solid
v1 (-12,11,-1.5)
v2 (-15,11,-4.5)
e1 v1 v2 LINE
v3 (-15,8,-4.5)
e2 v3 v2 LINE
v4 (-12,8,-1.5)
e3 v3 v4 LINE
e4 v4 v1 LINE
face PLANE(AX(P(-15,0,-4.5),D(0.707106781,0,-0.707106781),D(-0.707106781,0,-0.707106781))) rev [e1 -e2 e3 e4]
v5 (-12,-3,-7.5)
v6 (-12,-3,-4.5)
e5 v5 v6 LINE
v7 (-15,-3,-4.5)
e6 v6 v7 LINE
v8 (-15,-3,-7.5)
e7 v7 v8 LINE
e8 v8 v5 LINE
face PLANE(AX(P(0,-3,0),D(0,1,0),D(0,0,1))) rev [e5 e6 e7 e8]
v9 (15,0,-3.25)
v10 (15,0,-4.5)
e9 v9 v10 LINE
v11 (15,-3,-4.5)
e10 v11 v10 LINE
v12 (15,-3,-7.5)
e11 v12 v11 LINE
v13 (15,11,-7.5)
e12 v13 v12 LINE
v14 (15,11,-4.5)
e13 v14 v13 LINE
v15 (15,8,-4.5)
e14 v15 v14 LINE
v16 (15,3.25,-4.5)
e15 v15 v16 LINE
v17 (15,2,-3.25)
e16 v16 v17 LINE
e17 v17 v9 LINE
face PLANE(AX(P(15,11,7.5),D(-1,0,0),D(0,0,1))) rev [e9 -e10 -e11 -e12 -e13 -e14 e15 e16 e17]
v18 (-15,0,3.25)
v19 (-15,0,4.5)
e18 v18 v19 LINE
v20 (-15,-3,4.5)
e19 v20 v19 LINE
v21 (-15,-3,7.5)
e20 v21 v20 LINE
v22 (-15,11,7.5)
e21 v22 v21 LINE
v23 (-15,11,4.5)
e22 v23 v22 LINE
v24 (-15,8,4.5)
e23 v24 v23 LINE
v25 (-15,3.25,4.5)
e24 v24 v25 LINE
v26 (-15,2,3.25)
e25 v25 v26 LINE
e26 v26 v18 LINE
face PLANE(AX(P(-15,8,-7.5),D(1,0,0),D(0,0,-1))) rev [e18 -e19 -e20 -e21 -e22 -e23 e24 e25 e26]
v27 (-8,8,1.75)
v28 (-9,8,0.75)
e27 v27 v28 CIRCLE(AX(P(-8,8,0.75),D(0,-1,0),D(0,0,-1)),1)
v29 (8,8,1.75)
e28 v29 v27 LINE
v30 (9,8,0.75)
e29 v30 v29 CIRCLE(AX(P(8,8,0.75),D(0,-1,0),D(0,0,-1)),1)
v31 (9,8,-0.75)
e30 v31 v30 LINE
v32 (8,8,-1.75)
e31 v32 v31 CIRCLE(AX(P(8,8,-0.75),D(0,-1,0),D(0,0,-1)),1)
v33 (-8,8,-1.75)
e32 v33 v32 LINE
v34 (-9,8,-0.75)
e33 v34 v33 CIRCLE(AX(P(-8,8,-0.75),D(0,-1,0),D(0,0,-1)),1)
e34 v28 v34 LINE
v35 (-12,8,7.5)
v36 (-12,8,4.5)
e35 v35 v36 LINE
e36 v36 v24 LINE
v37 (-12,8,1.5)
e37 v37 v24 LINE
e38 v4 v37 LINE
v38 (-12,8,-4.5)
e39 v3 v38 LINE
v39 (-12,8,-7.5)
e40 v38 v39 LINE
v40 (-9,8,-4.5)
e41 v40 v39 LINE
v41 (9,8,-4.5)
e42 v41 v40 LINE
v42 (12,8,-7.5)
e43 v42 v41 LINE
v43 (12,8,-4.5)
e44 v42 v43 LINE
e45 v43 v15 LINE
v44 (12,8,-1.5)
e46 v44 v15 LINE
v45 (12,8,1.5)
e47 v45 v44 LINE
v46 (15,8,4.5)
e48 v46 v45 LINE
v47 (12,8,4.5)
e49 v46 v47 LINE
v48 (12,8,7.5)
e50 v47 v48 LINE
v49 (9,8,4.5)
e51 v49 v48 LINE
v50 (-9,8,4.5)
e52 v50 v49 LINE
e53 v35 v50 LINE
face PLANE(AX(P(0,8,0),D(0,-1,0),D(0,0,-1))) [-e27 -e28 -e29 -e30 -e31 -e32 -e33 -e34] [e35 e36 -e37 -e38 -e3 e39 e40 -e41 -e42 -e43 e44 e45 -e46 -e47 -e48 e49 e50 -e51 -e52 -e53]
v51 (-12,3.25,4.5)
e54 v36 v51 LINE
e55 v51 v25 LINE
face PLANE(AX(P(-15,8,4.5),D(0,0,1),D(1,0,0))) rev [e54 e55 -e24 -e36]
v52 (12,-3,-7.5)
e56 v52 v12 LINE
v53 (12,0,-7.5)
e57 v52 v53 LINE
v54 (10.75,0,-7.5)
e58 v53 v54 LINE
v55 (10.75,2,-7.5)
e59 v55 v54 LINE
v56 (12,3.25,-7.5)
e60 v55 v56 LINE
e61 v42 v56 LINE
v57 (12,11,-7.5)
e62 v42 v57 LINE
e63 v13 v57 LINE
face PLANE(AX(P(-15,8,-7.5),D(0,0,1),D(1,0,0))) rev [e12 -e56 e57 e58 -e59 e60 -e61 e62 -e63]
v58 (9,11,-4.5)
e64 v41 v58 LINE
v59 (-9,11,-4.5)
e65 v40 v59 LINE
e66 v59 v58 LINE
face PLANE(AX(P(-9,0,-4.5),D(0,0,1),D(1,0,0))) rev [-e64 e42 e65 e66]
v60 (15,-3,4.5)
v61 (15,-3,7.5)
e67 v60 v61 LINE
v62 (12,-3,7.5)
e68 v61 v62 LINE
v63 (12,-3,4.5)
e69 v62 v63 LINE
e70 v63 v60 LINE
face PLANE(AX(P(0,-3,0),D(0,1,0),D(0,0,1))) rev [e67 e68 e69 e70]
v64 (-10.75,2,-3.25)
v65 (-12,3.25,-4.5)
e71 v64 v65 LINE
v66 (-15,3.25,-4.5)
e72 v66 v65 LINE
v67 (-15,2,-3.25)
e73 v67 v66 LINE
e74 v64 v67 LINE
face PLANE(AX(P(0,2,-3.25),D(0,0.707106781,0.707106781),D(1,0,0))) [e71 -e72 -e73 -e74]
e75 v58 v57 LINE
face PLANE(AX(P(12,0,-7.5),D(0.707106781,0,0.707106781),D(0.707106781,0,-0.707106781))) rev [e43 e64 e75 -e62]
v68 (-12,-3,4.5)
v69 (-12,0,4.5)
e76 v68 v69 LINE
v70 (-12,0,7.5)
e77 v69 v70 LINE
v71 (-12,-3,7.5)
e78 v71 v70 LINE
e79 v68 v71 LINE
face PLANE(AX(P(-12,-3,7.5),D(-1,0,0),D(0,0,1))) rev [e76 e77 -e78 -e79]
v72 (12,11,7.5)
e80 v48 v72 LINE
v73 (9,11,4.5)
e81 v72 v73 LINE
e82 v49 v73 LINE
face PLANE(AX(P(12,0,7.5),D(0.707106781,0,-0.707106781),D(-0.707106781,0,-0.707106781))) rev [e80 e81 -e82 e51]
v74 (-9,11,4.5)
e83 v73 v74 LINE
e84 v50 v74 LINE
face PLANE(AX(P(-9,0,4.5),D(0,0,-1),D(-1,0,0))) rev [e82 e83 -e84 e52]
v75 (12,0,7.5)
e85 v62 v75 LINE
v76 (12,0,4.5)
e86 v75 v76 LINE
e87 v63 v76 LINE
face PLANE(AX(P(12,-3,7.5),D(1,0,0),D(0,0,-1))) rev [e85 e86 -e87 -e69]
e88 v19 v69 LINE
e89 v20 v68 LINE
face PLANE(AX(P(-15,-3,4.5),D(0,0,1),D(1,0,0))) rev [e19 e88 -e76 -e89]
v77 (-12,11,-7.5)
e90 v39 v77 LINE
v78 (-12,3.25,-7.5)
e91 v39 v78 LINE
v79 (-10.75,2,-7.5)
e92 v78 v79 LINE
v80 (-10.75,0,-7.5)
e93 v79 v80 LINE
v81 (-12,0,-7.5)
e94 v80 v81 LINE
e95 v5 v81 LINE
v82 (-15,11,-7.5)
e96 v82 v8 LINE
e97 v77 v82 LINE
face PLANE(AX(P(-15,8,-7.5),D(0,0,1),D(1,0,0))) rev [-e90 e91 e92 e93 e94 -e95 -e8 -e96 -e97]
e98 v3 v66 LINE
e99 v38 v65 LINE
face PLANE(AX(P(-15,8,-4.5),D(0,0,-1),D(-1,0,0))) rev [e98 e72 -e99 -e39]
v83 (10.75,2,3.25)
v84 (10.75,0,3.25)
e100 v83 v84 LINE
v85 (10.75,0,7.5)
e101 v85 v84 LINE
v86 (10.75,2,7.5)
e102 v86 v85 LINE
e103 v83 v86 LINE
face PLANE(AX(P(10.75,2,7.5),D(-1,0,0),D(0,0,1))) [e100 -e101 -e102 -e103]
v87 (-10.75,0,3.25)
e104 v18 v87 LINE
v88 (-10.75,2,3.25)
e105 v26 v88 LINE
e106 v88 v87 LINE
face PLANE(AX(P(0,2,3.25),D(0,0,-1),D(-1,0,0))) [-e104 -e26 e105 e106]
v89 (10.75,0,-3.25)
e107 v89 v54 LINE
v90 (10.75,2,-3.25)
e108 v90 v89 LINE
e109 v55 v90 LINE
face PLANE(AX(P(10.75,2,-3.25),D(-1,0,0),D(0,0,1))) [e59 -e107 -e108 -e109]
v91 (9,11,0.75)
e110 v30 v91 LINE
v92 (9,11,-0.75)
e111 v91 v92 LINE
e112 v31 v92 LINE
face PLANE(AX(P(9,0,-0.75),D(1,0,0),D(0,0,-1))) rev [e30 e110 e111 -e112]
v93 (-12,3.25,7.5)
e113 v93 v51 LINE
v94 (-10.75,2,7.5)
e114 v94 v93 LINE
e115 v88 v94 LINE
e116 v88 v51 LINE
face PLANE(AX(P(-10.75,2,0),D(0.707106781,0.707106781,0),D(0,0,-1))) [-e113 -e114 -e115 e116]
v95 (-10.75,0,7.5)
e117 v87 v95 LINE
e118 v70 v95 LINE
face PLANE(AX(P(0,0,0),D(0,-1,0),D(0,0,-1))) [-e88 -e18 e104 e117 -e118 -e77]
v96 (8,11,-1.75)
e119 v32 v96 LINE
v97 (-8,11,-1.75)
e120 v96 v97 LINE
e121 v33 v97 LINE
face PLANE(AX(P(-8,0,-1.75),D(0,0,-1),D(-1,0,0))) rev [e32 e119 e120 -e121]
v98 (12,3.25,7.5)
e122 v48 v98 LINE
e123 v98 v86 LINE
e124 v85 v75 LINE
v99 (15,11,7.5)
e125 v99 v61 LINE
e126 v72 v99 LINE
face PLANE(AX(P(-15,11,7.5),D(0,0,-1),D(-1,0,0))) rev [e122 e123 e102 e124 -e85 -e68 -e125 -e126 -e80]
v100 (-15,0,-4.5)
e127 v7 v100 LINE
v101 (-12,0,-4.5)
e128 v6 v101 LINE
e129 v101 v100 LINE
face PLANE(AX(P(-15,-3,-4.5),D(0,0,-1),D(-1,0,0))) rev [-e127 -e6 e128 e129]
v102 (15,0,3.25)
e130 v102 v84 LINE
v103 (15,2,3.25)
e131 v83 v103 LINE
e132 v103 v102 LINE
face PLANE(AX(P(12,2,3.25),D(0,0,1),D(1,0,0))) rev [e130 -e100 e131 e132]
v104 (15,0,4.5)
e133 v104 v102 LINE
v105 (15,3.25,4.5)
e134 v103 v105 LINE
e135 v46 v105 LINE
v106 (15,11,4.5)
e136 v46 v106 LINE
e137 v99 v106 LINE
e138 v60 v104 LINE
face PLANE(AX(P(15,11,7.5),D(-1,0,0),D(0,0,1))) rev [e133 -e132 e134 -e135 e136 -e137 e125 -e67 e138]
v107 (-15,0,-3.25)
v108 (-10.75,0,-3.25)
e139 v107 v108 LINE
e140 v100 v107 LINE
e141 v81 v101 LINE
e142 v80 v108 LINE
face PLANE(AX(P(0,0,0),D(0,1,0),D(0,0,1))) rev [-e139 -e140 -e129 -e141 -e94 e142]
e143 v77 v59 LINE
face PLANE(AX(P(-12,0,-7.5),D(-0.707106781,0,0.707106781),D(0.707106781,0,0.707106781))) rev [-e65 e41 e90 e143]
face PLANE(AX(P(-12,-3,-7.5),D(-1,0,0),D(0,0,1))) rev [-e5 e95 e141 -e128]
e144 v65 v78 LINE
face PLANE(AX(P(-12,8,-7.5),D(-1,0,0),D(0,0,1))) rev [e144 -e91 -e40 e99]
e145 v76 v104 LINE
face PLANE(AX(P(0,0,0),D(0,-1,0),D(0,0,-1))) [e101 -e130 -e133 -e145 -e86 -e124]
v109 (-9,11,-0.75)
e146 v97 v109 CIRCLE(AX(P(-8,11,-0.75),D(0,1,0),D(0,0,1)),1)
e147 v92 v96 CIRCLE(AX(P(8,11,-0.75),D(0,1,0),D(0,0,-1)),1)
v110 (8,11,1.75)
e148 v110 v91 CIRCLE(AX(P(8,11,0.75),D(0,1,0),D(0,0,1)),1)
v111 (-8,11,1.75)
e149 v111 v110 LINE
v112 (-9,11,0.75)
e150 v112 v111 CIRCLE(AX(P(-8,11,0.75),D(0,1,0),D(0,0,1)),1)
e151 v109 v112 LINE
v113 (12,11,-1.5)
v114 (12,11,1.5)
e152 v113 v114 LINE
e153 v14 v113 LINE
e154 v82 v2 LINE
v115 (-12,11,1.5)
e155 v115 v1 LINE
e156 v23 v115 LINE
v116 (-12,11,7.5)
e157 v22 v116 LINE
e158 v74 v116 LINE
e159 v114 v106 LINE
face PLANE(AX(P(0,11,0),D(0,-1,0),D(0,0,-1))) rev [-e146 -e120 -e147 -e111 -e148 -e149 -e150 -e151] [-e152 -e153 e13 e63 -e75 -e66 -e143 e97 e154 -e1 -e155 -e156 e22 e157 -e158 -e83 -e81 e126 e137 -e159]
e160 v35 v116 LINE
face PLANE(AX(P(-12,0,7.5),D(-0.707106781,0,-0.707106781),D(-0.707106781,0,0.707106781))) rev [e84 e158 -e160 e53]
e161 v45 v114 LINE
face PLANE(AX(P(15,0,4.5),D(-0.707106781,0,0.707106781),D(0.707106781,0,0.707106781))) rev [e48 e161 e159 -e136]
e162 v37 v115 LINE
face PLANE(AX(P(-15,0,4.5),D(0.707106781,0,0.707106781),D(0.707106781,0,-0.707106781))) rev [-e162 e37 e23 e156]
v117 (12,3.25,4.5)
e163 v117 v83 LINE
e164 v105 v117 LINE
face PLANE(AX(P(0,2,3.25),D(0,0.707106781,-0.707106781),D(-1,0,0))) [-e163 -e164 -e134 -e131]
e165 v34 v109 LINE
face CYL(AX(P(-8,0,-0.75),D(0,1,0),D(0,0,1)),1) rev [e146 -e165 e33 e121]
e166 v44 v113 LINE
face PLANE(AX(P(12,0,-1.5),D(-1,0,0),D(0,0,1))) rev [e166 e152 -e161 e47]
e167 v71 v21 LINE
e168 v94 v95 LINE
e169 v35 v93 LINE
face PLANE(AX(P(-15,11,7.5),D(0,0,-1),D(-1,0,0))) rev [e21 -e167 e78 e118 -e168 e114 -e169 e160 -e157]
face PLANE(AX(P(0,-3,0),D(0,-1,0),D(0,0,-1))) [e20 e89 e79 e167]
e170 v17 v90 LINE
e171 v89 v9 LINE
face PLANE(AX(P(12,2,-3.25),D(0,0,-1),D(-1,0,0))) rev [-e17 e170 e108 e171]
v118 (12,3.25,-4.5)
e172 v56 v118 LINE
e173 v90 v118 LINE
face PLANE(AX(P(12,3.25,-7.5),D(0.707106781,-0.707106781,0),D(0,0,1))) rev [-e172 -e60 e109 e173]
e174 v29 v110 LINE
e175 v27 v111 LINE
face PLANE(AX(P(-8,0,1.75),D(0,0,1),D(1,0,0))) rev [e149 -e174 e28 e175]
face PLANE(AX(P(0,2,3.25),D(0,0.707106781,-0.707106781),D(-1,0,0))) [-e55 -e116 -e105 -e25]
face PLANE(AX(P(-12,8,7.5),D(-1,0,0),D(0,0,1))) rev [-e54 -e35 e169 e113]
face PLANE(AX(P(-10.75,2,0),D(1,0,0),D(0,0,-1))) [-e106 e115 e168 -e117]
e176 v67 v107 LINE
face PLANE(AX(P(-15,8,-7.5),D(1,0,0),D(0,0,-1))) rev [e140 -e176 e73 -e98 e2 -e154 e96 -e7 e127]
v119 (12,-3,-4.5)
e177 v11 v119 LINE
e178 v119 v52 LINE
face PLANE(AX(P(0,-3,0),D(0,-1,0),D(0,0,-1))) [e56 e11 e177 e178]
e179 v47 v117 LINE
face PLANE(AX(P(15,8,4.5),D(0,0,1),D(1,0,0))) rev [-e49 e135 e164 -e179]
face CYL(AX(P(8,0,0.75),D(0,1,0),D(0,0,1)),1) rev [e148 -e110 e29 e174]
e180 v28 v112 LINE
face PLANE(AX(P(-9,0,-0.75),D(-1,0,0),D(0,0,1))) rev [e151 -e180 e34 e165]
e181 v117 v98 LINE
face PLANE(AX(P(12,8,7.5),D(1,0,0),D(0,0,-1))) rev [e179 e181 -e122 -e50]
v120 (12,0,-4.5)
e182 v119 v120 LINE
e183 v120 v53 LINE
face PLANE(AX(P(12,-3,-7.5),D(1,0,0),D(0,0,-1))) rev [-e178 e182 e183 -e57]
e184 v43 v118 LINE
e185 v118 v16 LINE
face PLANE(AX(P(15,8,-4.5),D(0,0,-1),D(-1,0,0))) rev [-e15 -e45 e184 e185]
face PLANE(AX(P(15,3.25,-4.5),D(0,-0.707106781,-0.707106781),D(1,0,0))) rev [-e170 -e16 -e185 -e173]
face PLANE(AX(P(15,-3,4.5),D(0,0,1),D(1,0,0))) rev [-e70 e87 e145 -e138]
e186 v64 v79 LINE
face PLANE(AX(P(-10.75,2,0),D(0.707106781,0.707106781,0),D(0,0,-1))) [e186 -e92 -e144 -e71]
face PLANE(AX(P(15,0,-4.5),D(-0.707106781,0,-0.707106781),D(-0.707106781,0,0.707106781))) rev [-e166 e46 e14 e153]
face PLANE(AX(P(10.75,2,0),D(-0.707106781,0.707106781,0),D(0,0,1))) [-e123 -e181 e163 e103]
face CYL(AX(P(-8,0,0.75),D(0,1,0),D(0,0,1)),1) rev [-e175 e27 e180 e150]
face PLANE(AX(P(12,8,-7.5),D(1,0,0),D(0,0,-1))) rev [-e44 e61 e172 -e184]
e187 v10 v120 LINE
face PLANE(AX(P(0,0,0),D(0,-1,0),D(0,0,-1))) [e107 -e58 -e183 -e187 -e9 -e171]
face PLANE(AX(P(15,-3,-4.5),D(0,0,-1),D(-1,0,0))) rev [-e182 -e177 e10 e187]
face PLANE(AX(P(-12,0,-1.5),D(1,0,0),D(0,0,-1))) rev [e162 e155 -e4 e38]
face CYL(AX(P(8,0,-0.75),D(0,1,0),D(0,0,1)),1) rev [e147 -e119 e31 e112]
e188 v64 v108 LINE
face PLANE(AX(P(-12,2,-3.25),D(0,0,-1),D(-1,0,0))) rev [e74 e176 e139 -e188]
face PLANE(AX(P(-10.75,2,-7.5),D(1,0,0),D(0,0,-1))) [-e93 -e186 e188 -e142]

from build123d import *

# Parameters (mm, degrees)
SKETCH1_W             = 3
SKETCH1_H             = 3
BOSS_EXTRUDE1_DEPTH   = 8
BOSS_EXTRUDE1_2_DEPTH = 8
BOSS_EXTRUDE1_3_DEPTH = 8
BOSS_EXTRUDE1_4_DEPTH = 8
SKETCH2_W             = 30
SKETCH2_H             = 15
BOSS_EXTRUDE2_DEPTH   = 3
CUT_EXTRUDE1_DEPTH    = 21.05617112
CUT_EXTRUDE2_DEPTH    = 21.05617112
BOSS_EXTRUDE3_DEPTH   = 2
CHAMFER1_SIZE         = 1.25
SKETCH7_W             = 3
SKETCH7_H             = 3
BOSS_EXTRUDE4_DEPTH   = 3


with BuildPart() as part:
    # Sketch1 → Boss-Extrude1 (new body)
    with BuildSketch(Plane(origin=(0, 0, 0), x_dir=(1, 0, 0), z_dir=(0, 1, 0))):
        with Locations((-13.5, 6)):
            Rectangle(SKETCH1_W, SKETCH1_H)
    extrude(amount=BOSS_EXTRUDE1_DEPTH)



with BuildPart() as body_2:
    # Sketch1 → Boss-Extrude1 2 (new body)
    with BuildSketch(Plane(origin=(0, 0, 0), x_dir=(1, 0, 0), z_dir=(0, 1, 0))):
        with Locations((13.5, 6)):
            Rectangle(SKETCH1_W, SKETCH1_H)
    extrude(amount=BOSS_EXTRUDE1_2_DEPTH)


with BuildPart() as body_3:
    # Sketch1 → Boss-Extrude1 3 (new body)
    with BuildSketch(Plane(origin=(0, 0, 0), x_dir=(1, 0, 0), z_dir=(0, 1, 0))):
        with Locations((13.5, -6)):
            Rectangle(SKETCH1_W, SKETCH1_H)
    extrude(amount=BOSS_EXTRUDE1_3_DEPTH)


with BuildPart() as body_4:
    # Sketch1 → Boss-Extrude1 4 (new body)
    with BuildSketch(Plane(origin=(0, 0, 0), x_dir=(1, 0, 0), z_dir=(0, 1, 0))):
        with Locations((-13.5, -6)):
            Rectangle(SKETCH1_W, SKETCH1_H)
    extrude(amount=BOSS_EXTRUDE1_4_DEPTH)


with BuildPart() as part_1:
    add(part.part)

    add(body_2.part)  # Boss-Extrude2 merges body 2

    add(body_3.part)  # Boss-Extrude2 merges body 3

    add(body_4.part)  # Boss-Extrude2 merges body 4
    # Sketch2 → Boss-Extrude2 (add)
    with BuildSketch(Plane(origin=(0, 8, 0), x_dir=(1, 0, 0), z_dir=(0, 1, 0))):
        Rectangle(SKETCH2_W, SKETCH2_H)
    extrude(amount=BOSS_EXTRUDE2_DEPTH)

    # Sketch3 → Cut-Extrude1 (cut, through all)
    with BuildSketch(Plane(origin=(0, 11, 0), x_dir=(1, 0, 0), z_dir=(0, 1, 0))):
        Polygon((-12, 7.5), (-9, 4.5), (9, 4.5), (12, 7.5), align=None)
        Polygon((-12, -7.5), (-9, -4.5), (9, -4.5), (12, -7.5), align=None)
        Polygon((-15, 4.5), (-12, 1.5), (-12, -1.5), (-15, -4.5), align=None)
        Polygon((15, 4.5), (12, 1.5), (12, -1.5), (15, -4.5), align=None)
    extrude(amount=-CUT_EXTRUDE1_DEPTH, mode=Mode.SUBTRACT)

    # Sketch4 → Cut-Extrude2 (cut, through all)
    with BuildSketch(Plane(origin=(0, 11, 0), x_dir=(1, 0, 0), z_dir=(0, 1, 0))):
        with BuildLine():
            Line((-8, 1.75), (8, 1.75))
            ThreePointArc((8, 1.75), (8.707106781, 1.457106781), (9, 0.75))
            Line((9, 0.75), (9, -0.75))
            ThreePointArc((9, -0.75), (8.707106781, -1.457106781), (8, -1.75))
            Line((8, -1.75), (-8, -1.75))
            ThreePointArc((-8, -1.75), (-8.707106781, -1.457106781), (-9, -0.75))
            Line((-9, -0.75), (-9, 0.75))
            ThreePointArc((-9, 0.75), (-8.707106781, 1.457106781), (-8, 1.75))
        make_face()
    extrude(amount=-CUT_EXTRUDE2_DEPTH, mode=Mode.SUBTRACT)

    # Sketch6 → Boss-Extrude3 (add)
    with BuildSketch(Plane.XZ):
        Polygon((-10.75, 7.5), (-12, 7.5), (-12, 4.5), (-15, 4.5), (-15, 3.25), (-10.75, 3.25), align=None)
        Polygon((12, 4.5), (12, 7.5), (10.75, 7.5), (10.75, 3.25), (15, 3.25), (15, 4.5), align=None)
        Polygon((10.75, -7.5), (12, -7.5), (12, -4.5), (15, -4.5), (15, -3.25), (10.75, -3.25), align=None)
        Polygon((-12, -4.5), (-12, -7.5), (-10.75, -7.5), (-10.75, -3.25), (-15, -3.25), (-15, -4.5), align=None)
    extrude(amount=-BOSS_EXTRUDE3_DEPTH)

    # Chamfer1
    chamfer1_edges = [part_1.edges().sort_by_distance(p)[0] for p in [
        (-12, 2, 6),
        (-13.5, 2, 4.5),
        (-13.5, 2, -4.5),
        (-12, 2, -6),
        (12, 2, 6),
        (13.5, 2, 4.5),
        (12, 2, -6),
        (13.5, 2, -4.5),
    ]]
    chamfer(chamfer1_edges, length=CHAMFER1_SIZE - 0.0001)  # a hair under: the kernel refuses the full size

    # Sketch7 → Boss-Extrude4 (add)
    with BuildSketch(Plane.XZ):
        with Locations((-13.5, 6)):
            Rectangle(SKETCH7_W, SKETCH7_H)
        with Locations((-13.5, -6)):
            Rectangle(SKETCH7_W, SKETCH7_H)
        with Locations((13.5, -6)):
            Rectangle(SKETCH7_W, SKETCH7_H)
        with Locations((13.5, 6)):
            Rectangle(SKETCH7_W, SKETCH7_H)
    extrude(amount=BOSS_EXTRUDE4_DEPTH)


solid = part_1.part
